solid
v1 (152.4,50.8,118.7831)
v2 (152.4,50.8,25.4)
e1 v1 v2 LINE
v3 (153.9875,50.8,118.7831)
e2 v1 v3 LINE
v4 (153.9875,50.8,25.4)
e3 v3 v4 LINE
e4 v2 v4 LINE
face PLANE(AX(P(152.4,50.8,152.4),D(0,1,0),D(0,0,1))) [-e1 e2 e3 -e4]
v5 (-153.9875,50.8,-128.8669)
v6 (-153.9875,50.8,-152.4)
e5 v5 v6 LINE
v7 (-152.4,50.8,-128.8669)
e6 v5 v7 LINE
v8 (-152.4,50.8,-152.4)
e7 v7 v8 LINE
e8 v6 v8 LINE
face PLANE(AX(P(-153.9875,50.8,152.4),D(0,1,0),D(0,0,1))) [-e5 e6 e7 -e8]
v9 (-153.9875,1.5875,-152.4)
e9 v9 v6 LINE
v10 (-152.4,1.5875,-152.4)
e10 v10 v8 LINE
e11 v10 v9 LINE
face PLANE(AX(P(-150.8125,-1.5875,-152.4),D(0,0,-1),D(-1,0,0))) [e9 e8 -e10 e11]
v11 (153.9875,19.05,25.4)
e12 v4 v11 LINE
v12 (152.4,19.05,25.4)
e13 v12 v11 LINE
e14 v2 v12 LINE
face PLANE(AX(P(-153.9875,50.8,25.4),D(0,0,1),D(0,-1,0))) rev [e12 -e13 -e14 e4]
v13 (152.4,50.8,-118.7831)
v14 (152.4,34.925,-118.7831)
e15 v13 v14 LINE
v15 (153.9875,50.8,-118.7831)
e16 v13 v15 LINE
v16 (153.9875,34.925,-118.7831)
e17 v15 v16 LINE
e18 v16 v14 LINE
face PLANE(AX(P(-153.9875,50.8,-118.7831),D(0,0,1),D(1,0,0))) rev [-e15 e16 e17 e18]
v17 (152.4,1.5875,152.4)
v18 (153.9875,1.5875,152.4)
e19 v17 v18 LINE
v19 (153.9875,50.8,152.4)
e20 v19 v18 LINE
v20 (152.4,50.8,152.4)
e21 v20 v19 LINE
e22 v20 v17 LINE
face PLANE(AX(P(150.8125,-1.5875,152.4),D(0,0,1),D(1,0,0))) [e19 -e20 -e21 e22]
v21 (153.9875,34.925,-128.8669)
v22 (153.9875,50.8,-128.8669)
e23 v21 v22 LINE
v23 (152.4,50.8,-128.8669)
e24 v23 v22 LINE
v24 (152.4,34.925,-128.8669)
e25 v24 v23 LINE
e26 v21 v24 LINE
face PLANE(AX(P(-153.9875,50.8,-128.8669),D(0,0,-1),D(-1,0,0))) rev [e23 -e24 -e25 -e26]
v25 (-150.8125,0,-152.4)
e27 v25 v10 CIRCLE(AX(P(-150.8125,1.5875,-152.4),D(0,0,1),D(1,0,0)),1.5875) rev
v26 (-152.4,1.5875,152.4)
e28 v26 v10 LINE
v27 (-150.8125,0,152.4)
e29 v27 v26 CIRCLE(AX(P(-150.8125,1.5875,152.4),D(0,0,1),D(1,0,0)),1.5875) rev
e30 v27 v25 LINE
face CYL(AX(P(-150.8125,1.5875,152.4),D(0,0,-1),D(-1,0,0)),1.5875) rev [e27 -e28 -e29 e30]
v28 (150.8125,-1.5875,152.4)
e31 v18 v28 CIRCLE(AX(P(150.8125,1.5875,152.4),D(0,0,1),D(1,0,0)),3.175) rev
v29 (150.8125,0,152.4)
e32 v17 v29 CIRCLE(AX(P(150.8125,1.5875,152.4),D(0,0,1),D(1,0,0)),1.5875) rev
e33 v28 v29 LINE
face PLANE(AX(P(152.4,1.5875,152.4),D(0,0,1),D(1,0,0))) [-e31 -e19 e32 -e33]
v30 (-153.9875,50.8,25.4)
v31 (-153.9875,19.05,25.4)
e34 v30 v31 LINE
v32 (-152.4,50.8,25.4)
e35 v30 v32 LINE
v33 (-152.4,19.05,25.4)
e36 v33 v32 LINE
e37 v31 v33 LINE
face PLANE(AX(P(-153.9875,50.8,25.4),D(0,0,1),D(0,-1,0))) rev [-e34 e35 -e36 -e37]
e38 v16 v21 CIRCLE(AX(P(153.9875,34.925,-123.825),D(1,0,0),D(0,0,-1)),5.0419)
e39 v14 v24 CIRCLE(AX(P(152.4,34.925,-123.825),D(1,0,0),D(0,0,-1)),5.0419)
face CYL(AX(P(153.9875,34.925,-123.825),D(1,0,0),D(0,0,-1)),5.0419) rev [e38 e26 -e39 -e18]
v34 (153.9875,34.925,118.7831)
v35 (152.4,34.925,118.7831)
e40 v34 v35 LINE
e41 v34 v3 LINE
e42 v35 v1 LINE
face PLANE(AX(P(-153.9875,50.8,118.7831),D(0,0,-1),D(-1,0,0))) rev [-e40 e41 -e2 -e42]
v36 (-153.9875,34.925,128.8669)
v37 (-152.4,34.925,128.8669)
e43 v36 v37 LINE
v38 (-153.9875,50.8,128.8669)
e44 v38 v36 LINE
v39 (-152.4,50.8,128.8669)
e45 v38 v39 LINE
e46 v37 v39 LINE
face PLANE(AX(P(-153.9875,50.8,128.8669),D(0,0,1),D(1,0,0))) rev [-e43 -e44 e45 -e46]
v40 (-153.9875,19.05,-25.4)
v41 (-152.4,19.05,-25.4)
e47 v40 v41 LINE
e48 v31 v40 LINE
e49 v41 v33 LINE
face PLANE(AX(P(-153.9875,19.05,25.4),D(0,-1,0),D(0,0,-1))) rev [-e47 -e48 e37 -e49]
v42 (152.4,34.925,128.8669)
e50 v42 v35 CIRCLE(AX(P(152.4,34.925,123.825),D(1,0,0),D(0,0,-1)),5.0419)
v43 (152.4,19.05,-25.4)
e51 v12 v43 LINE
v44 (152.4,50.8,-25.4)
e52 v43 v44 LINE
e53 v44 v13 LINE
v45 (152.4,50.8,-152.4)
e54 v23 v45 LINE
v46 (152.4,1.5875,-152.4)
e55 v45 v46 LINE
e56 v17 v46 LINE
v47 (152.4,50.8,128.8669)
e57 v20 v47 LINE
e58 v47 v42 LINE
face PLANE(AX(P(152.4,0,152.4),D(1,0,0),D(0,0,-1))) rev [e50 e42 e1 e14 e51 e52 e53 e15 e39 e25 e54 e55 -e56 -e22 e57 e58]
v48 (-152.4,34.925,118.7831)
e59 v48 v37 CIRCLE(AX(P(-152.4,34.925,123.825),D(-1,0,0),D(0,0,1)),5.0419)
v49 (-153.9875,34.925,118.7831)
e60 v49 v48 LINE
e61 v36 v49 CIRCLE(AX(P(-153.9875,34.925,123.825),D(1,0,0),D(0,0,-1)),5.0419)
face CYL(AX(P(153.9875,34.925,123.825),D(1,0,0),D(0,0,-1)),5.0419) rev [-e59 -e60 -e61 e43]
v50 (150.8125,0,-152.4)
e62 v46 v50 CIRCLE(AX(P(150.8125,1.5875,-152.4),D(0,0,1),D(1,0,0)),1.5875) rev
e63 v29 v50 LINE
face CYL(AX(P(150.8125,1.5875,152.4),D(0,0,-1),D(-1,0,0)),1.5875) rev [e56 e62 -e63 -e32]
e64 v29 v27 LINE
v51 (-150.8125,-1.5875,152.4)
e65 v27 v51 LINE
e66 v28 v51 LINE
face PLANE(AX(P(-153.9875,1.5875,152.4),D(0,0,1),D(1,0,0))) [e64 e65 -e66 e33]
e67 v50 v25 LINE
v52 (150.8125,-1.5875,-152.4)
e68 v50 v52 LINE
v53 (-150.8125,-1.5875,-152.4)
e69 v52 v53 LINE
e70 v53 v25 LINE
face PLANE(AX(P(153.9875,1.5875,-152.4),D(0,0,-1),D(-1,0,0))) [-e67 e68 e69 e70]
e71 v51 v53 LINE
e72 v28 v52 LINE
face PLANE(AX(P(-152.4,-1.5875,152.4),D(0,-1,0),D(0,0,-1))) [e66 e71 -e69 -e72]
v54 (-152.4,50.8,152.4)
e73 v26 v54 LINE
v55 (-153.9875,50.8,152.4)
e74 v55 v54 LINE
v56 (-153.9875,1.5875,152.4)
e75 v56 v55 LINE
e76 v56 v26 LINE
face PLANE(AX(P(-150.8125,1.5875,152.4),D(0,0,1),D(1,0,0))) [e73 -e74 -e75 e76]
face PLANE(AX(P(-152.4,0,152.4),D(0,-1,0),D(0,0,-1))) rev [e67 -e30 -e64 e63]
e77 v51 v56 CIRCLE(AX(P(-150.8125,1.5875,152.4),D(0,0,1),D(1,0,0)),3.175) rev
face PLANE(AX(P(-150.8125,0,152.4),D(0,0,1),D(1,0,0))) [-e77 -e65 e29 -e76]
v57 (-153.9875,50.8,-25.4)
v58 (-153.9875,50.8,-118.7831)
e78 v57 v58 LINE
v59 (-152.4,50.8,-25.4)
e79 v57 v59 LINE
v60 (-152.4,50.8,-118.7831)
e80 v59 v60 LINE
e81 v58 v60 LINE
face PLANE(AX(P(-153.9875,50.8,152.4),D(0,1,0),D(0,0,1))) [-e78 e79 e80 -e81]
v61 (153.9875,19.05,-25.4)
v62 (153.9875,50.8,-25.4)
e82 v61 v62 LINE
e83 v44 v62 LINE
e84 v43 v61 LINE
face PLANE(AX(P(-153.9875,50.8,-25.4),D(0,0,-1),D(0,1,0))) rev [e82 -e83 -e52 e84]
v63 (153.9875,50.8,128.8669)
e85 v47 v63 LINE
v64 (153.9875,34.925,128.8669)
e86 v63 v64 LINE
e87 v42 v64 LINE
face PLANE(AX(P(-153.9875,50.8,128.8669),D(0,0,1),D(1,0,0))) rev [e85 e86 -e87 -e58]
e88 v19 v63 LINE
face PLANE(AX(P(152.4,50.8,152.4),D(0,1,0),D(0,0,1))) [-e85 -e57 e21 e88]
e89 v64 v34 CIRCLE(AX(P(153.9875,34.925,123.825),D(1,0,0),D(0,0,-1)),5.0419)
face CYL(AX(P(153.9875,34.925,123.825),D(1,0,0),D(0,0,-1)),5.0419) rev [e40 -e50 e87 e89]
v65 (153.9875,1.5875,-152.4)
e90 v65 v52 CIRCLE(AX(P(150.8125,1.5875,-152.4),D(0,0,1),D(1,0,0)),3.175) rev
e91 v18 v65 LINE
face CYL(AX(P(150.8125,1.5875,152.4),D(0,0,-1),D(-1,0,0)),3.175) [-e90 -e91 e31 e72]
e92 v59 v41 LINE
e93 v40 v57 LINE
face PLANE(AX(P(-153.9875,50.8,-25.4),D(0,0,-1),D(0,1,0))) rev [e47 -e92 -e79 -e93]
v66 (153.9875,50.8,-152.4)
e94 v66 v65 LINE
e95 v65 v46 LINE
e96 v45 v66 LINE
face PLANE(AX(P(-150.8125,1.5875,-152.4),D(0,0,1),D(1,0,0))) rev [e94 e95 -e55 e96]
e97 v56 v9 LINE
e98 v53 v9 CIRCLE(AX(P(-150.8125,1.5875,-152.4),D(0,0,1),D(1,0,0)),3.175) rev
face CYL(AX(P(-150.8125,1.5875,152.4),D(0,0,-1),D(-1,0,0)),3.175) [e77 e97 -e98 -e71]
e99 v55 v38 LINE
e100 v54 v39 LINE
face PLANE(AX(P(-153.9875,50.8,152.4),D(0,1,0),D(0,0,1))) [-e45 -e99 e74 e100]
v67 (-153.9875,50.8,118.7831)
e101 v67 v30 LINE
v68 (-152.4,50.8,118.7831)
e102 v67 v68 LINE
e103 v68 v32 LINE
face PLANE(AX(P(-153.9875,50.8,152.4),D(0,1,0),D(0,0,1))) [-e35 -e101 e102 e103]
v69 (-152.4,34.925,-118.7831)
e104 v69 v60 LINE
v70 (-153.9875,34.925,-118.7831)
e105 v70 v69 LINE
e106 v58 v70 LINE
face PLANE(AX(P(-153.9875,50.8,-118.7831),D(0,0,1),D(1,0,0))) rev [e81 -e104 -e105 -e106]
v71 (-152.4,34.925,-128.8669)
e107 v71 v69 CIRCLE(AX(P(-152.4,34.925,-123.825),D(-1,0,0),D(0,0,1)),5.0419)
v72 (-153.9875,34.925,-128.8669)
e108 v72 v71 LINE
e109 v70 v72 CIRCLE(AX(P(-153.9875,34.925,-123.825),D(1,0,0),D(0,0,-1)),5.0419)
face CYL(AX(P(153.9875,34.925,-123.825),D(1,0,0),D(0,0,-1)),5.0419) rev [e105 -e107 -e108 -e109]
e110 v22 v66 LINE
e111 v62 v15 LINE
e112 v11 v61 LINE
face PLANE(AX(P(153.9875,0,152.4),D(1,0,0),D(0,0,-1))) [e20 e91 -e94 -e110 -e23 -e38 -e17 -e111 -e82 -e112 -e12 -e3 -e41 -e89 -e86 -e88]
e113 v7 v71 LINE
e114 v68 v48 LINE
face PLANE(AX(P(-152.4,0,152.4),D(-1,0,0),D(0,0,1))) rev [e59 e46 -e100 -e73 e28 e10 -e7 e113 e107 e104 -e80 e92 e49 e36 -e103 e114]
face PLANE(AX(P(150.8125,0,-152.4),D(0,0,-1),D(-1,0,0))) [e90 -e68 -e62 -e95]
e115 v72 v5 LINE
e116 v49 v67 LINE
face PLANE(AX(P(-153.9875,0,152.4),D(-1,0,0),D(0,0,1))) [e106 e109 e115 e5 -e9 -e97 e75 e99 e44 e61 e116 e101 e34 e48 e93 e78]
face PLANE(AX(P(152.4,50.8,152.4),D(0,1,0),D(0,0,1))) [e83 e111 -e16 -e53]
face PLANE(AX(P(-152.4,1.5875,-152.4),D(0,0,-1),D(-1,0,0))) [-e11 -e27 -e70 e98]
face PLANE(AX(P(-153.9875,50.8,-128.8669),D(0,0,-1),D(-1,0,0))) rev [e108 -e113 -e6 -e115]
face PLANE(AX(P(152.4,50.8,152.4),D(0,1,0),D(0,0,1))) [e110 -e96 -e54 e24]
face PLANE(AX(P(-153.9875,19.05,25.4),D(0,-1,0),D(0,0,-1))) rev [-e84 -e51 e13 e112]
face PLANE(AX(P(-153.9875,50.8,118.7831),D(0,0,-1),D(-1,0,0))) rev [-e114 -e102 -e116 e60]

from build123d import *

# Parameters (mm, degrees)
BASE_FLANGE1_DEPTH      = 152.4
SKETCH6_W               = 50.8
SKETCH6_H               = 31.75
CUT_EXTRUDE1_DEPTH      = 348.354286896
F_3_8_CLEARANCE_HOLE1_D = 10.0838
SKETCH8_W               = 10.0838
SKETCH8_H               = 15.875
CUT_EXTRUDE2_DEPTH      = 348.354286896


# Sheet-metal steps are written as plain solids
with BuildPart() as part:
    # Sketch1 → Base-Flange1 (new, symmetric)
    with BuildSketch(Plane.XY):
        with BuildLine():
            Line((-152.4, 50.8), (-152.4, 1.5875))
            ThreePointArc((-152.4, 1.5875), (-151.935032015, 0.464967985), (-150.8125, 0))
            Line((-150.8125, 0), (150.8125, 0))
            ThreePointArc((150.8125, 0), (151.935032015, 0.464967985), (152.4, 1.5875))
            Line((152.4, 1.5875), (152.4, 50.8))
            Line((152.4, 50.8), (153.9875, 50.8))
            Line((153.9875, 50.8), (153.9875, 1.5875))
            ThreePointArc((153.9875, 1.5875), (153.05756403, -0.65756403), (150.8125, -1.5875))
            Line((150.8125, -1.5875), (-150.8125, -1.5875))
            ThreePointArc((-150.8125, -1.5875), (-153.05756403, -0.65756403), (-153.9875, 1.5875))
            Line((-153.9875, 1.5875), (-153.9875, 50.8))
            Line((-153.9875, 50.8), (-152.4, 50.8))
        make_face()
    extrude(amount=BASE_FLANGE1_DEPTH, both=True)

    # Sketch6 → Cut-Extrude1 (cut, through all)
    with BuildSketch(Plane(origin=(153.9875, 0, 0), x_dir=(0, 0, -1), z_dir=(1, 0, 0))):
        with Locations((0, 34.925)):
            Rectangle(SKETCH6_W, SKETCH6_H)
    extrude(amount=-CUT_EXTRUDE1_DEPTH, mode=Mode.SUBTRACT)

    # 3/8 Clearance Hole1 (through all)
    with Locations(Plane(origin=(153.9875, 34.925, 123.825), x_dir=(0, 0, 1), z_dir=(1, 0, 0))):
        with Locations((0, 0), (-247.65, 0)):
            Hole(F_3_8_CLEARANCE_HOLE1_D / 2)

    # Sketch8 → Cut-Extrude2 (cut, through all)
    with BuildSketch(Plane(origin=(153.9875, 0, 0), x_dir=(0, 0, -1), z_dir=(1, 0, 0))):
        with Locations((-123.825, 42.8625)):
            Rectangle(SKETCH8_W, SKETCH8_H)
        with Locations((123.825, 42.8625)):
            Rectangle(SKETCH8_W, SKETCH8_H)
    extrude(amount=-CUT_EXTRUDE2_DEPTH, mode=Mode.SUBTRACT)


solid = part.part
